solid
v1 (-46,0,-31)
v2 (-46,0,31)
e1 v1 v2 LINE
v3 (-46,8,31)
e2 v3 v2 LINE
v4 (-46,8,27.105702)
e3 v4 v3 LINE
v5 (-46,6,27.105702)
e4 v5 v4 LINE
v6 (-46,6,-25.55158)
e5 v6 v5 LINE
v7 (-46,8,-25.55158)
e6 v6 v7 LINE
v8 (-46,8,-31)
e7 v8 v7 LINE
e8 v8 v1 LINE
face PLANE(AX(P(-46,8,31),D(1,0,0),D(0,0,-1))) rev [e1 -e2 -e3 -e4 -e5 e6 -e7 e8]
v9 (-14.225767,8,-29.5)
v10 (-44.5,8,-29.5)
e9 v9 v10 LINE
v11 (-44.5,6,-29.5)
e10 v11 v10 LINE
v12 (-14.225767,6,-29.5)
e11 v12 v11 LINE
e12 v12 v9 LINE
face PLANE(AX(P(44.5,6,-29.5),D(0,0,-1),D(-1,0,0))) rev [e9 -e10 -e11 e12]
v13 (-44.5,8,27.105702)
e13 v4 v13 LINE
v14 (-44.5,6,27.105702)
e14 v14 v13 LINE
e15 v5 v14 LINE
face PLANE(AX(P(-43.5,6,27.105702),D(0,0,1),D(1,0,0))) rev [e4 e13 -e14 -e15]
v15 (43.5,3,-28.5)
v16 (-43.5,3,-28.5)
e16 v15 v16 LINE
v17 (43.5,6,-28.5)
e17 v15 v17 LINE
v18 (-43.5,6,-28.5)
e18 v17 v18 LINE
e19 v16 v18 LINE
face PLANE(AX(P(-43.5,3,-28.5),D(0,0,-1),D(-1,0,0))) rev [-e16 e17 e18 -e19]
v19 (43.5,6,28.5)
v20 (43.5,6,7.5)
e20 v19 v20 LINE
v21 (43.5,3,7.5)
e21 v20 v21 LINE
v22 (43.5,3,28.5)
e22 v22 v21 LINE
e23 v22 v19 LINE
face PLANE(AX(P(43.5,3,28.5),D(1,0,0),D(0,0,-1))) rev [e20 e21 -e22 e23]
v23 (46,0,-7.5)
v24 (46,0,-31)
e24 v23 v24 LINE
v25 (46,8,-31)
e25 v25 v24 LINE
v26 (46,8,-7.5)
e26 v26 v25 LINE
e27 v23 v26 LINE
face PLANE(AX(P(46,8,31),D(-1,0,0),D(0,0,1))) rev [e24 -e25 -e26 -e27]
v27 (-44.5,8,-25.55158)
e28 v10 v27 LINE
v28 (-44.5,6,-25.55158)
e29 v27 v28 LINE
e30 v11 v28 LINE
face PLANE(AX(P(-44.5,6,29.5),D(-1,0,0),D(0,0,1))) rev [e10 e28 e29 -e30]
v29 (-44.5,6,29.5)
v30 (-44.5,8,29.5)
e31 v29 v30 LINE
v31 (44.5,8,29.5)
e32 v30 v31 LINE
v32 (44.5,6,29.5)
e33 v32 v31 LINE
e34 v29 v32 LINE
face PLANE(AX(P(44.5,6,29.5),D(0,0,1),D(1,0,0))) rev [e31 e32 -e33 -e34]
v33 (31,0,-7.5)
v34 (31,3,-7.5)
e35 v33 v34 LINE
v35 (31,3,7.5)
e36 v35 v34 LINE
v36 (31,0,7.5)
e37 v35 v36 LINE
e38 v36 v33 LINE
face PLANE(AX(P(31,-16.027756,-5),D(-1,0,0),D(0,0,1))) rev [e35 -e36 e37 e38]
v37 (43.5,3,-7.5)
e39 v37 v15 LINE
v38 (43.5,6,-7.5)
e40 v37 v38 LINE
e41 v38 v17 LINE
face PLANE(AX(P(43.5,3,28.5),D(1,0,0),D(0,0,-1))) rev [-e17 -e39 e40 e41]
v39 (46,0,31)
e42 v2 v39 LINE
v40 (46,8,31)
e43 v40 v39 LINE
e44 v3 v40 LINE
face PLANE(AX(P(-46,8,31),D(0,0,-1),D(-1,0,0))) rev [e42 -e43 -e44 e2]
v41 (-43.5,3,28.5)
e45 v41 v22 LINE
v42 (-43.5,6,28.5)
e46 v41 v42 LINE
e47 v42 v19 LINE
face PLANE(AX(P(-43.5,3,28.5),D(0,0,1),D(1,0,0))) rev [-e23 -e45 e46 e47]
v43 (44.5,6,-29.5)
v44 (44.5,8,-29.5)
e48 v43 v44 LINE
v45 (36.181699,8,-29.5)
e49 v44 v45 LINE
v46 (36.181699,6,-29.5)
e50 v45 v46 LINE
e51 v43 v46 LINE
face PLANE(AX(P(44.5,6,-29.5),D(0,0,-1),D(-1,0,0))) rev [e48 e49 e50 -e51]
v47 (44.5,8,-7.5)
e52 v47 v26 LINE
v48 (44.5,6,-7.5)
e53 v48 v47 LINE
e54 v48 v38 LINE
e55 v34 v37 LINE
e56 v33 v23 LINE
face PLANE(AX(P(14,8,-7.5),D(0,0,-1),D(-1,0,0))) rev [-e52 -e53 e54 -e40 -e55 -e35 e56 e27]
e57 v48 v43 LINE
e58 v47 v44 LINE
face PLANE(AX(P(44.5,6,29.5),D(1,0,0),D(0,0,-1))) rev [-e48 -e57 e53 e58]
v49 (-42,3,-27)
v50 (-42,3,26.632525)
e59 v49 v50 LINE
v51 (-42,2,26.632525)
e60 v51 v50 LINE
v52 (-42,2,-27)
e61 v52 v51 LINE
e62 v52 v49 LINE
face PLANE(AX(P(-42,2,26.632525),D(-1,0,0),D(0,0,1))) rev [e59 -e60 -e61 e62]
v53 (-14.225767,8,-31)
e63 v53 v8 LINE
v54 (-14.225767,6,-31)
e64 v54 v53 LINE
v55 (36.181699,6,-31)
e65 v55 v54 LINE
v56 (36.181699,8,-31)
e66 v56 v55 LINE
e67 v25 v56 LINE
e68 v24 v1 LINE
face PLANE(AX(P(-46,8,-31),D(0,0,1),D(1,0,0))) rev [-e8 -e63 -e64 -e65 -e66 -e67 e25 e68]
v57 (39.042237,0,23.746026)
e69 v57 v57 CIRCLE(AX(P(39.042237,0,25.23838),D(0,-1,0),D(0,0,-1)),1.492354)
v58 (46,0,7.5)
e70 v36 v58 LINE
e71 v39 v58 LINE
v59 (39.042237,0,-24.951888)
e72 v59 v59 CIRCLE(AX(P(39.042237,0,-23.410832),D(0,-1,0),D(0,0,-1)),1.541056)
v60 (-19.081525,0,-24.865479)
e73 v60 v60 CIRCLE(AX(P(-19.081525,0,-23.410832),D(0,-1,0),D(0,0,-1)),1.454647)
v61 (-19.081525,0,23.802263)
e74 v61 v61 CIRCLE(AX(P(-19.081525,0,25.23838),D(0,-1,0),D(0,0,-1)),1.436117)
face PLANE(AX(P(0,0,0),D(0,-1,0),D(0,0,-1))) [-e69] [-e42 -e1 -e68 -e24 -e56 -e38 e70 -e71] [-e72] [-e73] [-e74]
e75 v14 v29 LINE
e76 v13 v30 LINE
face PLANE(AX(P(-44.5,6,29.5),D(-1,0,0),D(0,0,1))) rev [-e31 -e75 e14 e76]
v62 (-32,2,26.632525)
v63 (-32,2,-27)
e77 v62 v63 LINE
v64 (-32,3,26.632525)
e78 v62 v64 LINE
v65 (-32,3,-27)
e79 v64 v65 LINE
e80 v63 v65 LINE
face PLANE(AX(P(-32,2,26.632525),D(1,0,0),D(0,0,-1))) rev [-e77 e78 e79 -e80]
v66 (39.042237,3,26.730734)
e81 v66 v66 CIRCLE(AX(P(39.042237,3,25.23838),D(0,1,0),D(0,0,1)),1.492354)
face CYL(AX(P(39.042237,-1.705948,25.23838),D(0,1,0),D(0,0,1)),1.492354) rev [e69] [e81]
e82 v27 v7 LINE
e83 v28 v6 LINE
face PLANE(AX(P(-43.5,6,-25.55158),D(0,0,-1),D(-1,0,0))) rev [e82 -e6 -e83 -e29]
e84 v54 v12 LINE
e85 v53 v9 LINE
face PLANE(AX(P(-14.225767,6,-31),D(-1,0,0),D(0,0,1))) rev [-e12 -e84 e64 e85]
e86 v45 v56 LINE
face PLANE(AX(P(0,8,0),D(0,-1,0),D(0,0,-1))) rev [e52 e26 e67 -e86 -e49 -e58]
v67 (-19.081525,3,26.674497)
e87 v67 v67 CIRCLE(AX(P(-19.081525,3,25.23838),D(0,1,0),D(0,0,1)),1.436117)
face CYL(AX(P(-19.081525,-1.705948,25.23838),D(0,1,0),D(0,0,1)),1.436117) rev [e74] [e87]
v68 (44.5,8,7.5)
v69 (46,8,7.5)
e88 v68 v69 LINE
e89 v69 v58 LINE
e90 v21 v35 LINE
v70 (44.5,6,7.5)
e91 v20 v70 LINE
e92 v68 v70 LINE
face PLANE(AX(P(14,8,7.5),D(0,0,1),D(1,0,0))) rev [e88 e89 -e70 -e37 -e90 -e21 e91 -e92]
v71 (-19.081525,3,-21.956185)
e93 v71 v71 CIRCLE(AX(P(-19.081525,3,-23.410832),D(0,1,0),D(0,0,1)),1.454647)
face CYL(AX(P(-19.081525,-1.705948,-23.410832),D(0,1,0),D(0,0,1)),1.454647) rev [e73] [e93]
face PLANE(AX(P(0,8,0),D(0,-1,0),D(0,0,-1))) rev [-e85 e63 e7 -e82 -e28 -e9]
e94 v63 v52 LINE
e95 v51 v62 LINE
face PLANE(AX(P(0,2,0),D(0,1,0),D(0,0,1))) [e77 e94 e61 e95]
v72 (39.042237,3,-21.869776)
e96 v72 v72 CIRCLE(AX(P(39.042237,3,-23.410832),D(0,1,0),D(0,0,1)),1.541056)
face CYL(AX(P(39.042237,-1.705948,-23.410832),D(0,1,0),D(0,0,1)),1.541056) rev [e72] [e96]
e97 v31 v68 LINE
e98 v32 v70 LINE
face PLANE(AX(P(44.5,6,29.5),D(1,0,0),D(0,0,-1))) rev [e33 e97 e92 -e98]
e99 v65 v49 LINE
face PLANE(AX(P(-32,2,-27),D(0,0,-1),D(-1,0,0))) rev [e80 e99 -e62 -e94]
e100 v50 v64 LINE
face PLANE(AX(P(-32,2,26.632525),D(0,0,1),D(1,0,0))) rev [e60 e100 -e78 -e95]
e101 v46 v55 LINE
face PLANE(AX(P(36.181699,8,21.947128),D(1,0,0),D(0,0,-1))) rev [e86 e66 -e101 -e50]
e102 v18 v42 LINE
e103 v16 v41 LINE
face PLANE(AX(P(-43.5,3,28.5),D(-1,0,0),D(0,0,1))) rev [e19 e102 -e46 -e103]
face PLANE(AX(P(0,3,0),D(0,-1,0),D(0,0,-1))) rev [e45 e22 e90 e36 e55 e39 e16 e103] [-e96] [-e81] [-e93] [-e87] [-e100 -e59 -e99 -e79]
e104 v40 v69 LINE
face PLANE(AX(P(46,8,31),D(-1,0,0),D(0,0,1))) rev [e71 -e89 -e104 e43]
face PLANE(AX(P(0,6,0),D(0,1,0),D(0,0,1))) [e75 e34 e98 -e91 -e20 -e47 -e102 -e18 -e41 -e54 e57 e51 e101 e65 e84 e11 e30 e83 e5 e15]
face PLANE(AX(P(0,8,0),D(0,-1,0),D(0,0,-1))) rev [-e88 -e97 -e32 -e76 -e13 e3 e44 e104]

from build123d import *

# Parameters (mm, degrees)
CROQUIS2_W              = 92
CROQUIS2_H              = 62
SALIENTE_EXTRUIR1_DEPTH = 8
CROQUIS3_W              = 89
CROQUIS3_H              = 59
CORTAR_EXTRUIR1_DEPTH   = 2
CROQUIS4_W              = 87
CROQUIS4_H              = 57
CORTAR_EXTRUIR2_DEPTH   = 3
CROQUIS5_W              = 10
CROQUIS5_H              = 53.632525493
CORTAR_EXTRUIR3_DEPTH   = 1
CORTAR_EXTRUIR4_REACH   = 57.696
CROQUIS6_W              = 15
CROQUIS6_H              = 10
CROQUIS7_R              = 5
CORTAR_EXTRUIR5_DEPTH   = 56.794264938
REDONDEO1_R             = 5
CROQUIS9_W              = 2.5
CROQUIS9_H              = 17.009234147
CROQUIS9_H_2            = 13.999979608
CROQUIS9_H_3            = 14.150072655
CROQUIS9_W_2            = 9.965409089
CROQUIS9_H_4            = 2.5
CROQUIS9_W_3            = 7.294458122
CROQUIS9_W_4            = 7.420347284
CROQUIS9_W_5            = 5
CORTAR_EXTRUIR7_DEPTH   = 2
CROQUIS10_R             = 1.492354092
CROQUIS10_R_2           = 1.54105633
CROQUIS10_R_3           = 1.454647155
CROQUIS10_R_4           = 1.436117112
CORTAR_EXTRUIR8_DEPTH   = 56.695601345
CORTAR_EXTRUIR9_REACH   = 99.411
CROQUIS11_W             = 15
CROQUIS11_H             = 8
CROQUIS12_W             = 50.407466657
CROQUIS12_H             = 2
CORTAR_EXTRUIR10_DEPTH  = 2.5
CROQUIS13_W             = 52.657281968
CROQUIS13_H             = 2
CORTAR_EXTRUIR11_DEPTH  = 2.5


with BuildPart() as part:
    # Croquis2 → Saliente-Extruir1 (new body)
    with BuildSketch(Plane(origin=(0, 0, 0), x_dir=(1, 0, 0), z_dir=(0, 1, 0))):
        Rectangle(CROQUIS2_W, CROQUIS2_H)
    extrude(amount=SALIENTE_EXTRUIR1_DEPTH)

    # Croquis3 → Cortar-Extruir1 (cut)
    with BuildSketch(Plane(origin=(0, 8, 0), x_dir=(1, 0, 0), z_dir=(0, 1, 0))):
        Rectangle(CROQUIS3_W, CROQUIS3_H)
    extrude(amount=-CORTAR_EXTRUIR1_DEPTH, mode=Mode.SUBTRACT)

    # Croquis4 → Cortar-Extruir2 (cut)
    with BuildSketch(Plane(origin=(0, 6, 0), x_dir=(1, 0, 0), z_dir=(0, 1, 0))):
        Rectangle(CROQUIS4_W, CROQUIS4_H)
    extrude(amount=-CORTAR_EXTRUIR2_DEPTH, mode=Mode.SUBTRACT)

    # Croquis5 → Cortar-Extruir3 (cut)
    with BuildSketch(Plane(origin=(0, 3, 0), x_dir=(1, 0, 0), z_dir=(0, 1, 0))):
        with Locations((-37, 0.183737253)):
            Rectangle(CROQUIS5_W, CROQUIS5_H)
    extrude(amount=-CORTAR_EXTRUIR3_DEPTH, mode=Mode.SUBTRACT)

    # Cortar-Extruir4: up to this face of the body (flat: up to its plane)
    cortar_extruir4_end = Plane(part.part.faces().sort_by_distance((-37, 2, -0.183737254))[0])
    # Croquis6 → Cortar-Extruir4 (cut, up to the picked face)
    with BuildSketch(Plane(origin=(0, 5, 0), x_dir=(1, 0, 0), z_dir=(0, 1, 0)), mode=Mode.PRIVATE) as cortar_extruir4_sk1:
        with Locations((38.5, 0)):
            Rectangle(CROQUIS6_W, CROQUIS6_H)
    cortar_extruir4_tool1 = split(extrude(cortar_extruir4_sk1.sketch, amount=-CORTAR_EXTRUIR4_REACH, mode=Mode.PRIVATE), bisect_by=cortar_extruir4_end, keep=Keep.BOTH, mode=Mode.PRIVATE)
    add(cortar_extruir4_tool1.solids().sort_by(Axis((38.5, 5, 0), (0, -1, 0)))[0], mode=Mode.SUBTRACT)

    # Croquis7 → Cortar-Extruir5 (cut, through all)
    with BuildSketch(Plane(origin=(0, 2, 0), x_dir=(1, 0, 0), z_dir=(0, 1, 0))):
        with Locations((46, 0)):
            Circle(CROQUIS7_R)
    extrude(amount=-CORTAR_EXTRUIR5_DEPTH, mode=Mode.SUBTRACT)

    # Redondeo1
    # the kernel refuses this fillet: 5 mm, written as the material it takes off along each edge
    with BuildSketch(Plane(origin=(46, 2, 0), x_dir=(0.9999950652018581, 0, -0.00314158748587981), z_dir=(0.00314158748587981, 0, 0.9999950652018581))) as redondeo1_piece_1_section:
        with BuildLine():
            CenterArc((9, -5), REDONDEO1_R, 90, 53.130102354)
            Line((9, 0), (5, 0))
            Line((5, 0), (5, -2))
        make_face()
    redondeo1_piece_1 = revolve(axis=Axis((46, 2, 0), (0, 1, 0)), revolution_arc=359.64, mode=Mode.PRIVATE)
    redondeo1_piece_1 = split(redondeo1_piece_1, bisect_by=Plane(origin=(39.240540113, 1.481080227, 5), z_dir=(0, 0, -1)), keep=Keep.TOP, mode=Mode.PRIVATE)
    redondeo1_piece_1 = split(redondeo1_piece_1, bisect_by=Plane(origin=(39.240540113, 1.481080227, -5), z_dir=(0, 0, 1)), keep=Keep.TOP, mode=Mode.PRIVATE)
    add(redondeo1_piece_1, mode=Mode.SUBTRACT)

    # Croquis9 → Cortar-Extruir7 (cut)
    with BuildSketch(Plane(origin=(0, 8, 0), x_dir=(1, 0, 0), z_dir=(0, 1, 0))):
        with Locations((-44.75, -18.601084438)):
            Rectangle(CROQUIS9_W, CROQUIS9_H)
        with Locations((-44.75, 0.477589339)):
            Rectangle(CROQUIS9_W, CROQUIS9_H_2)
        with Locations((-44.75, 18.476544129)):
            Rectangle(CROQUIS9_W, CROQUIS9_H_3)
        with Locations((31.175863948, 29.75)):
            Rectangle(CROQUIS9_W_2, CROQUIS9_H_4)
        with Locations((16.194930406, 29.75)):
            Rectangle(CROQUIS9_W_3, CROQUIS9_H_4)
        with Locations((2.577919336, 29.75)):
            Rectangle(CROQUIS9_W_4, CROQUIS9_H_4)
        with Locations((-11.725767222, 29.75)):
            Rectangle(CROQUIS9_W_5, CROQUIS9_H_4)
    extrude(amount=-CORTAR_EXTRUIR7_DEPTH, mode=Mode.SUBTRACT)

    # Croquis10 → Cortar-Extruir8 (cut, through all)
    with BuildSketch(Plane(origin=(0, 3, 0), x_dir=(1, 0, 0), z_dir=(0, 1, 0))):
        with Locations(Location((39.042237476, -25.238379945, 0), (0, 0, 270))):
            Circle(CROQUIS10_R)
        with Locations(Location((39.042237476, 23.410831917, 0), (0, 0, 270))):
            Circle(CROQUIS10_R_2)
        with Locations(Location((-19.081524932, 23.410831917, 0), (0, 0, 270))):
            Circle(CROQUIS10_R_3)
        with Locations(Location((-19.081524932, -25.238379945, 0), (0, 0, 270))):
            Circle(CROQUIS10_R_4)
    extrude(amount=-CORTAR_EXTRUIR8_DEPTH, mode=Mode.SUBTRACT)

    # Cortar-Extruir9: up to this face of the body (flat: up to its plane)
    cortar_extruir9_end = Plane(part.part.faces().sort_by_distance((31, 2.5, 0))[0])
    # Croquis11 → Cortar-Extruir9 (cut, up to the picked face)
    with BuildSketch(Plane(origin=(46, 0, 0), x_dir=(0, 0, -1), z_dir=(1, 0, 0)), mode=Mode.PRIVATE) as cortar_extruir9_sk1:
        with Locations((0, 4)):
            Rectangle(CROQUIS11_W, CROQUIS11_H)
    cortar_extruir9_tool1 = split(extrude(cortar_extruir9_sk1.sketch, amount=-CORTAR_EXTRUIR9_REACH, mode=Mode.PRIVATE), bisect_by=cortar_extruir9_end, keep=Keep.BOTH, mode=Mode.PRIVATE)
    add(cortar_extruir9_tool1.solids().sort_by(Axis((46, 4, 0), (-1, 0, 0)))[0], mode=Mode.SUBTRACT)

    # Croquis12 → Cortar-Extruir10 (cut)
    with BuildSketch(Plane(origin=(0, 0, -31), x_dir=(-1, 0, 0), z_dir=(0, 0, -1))):
        with Locations((-10.977966106, 7)):
            Rectangle(CROQUIS12_W, CROQUIS12_H)
    extrude(amount=-CORTAR_EXTRUIR10_DEPTH, mode=Mode.SUBTRACT)

    # Croquis13 → Cortar-Extruir11 (cut)
    with BuildSketch(Plane.ZY.offset(46)):
        with Locations((0.777060527, 7)):
            Rectangle(CROQUIS13_W, CROQUIS13_H)
    extrude(amount=-CORTAR_EXTRUIR11_DEPTH, mode=Mode.SUBTRACT)


solid = part.part
